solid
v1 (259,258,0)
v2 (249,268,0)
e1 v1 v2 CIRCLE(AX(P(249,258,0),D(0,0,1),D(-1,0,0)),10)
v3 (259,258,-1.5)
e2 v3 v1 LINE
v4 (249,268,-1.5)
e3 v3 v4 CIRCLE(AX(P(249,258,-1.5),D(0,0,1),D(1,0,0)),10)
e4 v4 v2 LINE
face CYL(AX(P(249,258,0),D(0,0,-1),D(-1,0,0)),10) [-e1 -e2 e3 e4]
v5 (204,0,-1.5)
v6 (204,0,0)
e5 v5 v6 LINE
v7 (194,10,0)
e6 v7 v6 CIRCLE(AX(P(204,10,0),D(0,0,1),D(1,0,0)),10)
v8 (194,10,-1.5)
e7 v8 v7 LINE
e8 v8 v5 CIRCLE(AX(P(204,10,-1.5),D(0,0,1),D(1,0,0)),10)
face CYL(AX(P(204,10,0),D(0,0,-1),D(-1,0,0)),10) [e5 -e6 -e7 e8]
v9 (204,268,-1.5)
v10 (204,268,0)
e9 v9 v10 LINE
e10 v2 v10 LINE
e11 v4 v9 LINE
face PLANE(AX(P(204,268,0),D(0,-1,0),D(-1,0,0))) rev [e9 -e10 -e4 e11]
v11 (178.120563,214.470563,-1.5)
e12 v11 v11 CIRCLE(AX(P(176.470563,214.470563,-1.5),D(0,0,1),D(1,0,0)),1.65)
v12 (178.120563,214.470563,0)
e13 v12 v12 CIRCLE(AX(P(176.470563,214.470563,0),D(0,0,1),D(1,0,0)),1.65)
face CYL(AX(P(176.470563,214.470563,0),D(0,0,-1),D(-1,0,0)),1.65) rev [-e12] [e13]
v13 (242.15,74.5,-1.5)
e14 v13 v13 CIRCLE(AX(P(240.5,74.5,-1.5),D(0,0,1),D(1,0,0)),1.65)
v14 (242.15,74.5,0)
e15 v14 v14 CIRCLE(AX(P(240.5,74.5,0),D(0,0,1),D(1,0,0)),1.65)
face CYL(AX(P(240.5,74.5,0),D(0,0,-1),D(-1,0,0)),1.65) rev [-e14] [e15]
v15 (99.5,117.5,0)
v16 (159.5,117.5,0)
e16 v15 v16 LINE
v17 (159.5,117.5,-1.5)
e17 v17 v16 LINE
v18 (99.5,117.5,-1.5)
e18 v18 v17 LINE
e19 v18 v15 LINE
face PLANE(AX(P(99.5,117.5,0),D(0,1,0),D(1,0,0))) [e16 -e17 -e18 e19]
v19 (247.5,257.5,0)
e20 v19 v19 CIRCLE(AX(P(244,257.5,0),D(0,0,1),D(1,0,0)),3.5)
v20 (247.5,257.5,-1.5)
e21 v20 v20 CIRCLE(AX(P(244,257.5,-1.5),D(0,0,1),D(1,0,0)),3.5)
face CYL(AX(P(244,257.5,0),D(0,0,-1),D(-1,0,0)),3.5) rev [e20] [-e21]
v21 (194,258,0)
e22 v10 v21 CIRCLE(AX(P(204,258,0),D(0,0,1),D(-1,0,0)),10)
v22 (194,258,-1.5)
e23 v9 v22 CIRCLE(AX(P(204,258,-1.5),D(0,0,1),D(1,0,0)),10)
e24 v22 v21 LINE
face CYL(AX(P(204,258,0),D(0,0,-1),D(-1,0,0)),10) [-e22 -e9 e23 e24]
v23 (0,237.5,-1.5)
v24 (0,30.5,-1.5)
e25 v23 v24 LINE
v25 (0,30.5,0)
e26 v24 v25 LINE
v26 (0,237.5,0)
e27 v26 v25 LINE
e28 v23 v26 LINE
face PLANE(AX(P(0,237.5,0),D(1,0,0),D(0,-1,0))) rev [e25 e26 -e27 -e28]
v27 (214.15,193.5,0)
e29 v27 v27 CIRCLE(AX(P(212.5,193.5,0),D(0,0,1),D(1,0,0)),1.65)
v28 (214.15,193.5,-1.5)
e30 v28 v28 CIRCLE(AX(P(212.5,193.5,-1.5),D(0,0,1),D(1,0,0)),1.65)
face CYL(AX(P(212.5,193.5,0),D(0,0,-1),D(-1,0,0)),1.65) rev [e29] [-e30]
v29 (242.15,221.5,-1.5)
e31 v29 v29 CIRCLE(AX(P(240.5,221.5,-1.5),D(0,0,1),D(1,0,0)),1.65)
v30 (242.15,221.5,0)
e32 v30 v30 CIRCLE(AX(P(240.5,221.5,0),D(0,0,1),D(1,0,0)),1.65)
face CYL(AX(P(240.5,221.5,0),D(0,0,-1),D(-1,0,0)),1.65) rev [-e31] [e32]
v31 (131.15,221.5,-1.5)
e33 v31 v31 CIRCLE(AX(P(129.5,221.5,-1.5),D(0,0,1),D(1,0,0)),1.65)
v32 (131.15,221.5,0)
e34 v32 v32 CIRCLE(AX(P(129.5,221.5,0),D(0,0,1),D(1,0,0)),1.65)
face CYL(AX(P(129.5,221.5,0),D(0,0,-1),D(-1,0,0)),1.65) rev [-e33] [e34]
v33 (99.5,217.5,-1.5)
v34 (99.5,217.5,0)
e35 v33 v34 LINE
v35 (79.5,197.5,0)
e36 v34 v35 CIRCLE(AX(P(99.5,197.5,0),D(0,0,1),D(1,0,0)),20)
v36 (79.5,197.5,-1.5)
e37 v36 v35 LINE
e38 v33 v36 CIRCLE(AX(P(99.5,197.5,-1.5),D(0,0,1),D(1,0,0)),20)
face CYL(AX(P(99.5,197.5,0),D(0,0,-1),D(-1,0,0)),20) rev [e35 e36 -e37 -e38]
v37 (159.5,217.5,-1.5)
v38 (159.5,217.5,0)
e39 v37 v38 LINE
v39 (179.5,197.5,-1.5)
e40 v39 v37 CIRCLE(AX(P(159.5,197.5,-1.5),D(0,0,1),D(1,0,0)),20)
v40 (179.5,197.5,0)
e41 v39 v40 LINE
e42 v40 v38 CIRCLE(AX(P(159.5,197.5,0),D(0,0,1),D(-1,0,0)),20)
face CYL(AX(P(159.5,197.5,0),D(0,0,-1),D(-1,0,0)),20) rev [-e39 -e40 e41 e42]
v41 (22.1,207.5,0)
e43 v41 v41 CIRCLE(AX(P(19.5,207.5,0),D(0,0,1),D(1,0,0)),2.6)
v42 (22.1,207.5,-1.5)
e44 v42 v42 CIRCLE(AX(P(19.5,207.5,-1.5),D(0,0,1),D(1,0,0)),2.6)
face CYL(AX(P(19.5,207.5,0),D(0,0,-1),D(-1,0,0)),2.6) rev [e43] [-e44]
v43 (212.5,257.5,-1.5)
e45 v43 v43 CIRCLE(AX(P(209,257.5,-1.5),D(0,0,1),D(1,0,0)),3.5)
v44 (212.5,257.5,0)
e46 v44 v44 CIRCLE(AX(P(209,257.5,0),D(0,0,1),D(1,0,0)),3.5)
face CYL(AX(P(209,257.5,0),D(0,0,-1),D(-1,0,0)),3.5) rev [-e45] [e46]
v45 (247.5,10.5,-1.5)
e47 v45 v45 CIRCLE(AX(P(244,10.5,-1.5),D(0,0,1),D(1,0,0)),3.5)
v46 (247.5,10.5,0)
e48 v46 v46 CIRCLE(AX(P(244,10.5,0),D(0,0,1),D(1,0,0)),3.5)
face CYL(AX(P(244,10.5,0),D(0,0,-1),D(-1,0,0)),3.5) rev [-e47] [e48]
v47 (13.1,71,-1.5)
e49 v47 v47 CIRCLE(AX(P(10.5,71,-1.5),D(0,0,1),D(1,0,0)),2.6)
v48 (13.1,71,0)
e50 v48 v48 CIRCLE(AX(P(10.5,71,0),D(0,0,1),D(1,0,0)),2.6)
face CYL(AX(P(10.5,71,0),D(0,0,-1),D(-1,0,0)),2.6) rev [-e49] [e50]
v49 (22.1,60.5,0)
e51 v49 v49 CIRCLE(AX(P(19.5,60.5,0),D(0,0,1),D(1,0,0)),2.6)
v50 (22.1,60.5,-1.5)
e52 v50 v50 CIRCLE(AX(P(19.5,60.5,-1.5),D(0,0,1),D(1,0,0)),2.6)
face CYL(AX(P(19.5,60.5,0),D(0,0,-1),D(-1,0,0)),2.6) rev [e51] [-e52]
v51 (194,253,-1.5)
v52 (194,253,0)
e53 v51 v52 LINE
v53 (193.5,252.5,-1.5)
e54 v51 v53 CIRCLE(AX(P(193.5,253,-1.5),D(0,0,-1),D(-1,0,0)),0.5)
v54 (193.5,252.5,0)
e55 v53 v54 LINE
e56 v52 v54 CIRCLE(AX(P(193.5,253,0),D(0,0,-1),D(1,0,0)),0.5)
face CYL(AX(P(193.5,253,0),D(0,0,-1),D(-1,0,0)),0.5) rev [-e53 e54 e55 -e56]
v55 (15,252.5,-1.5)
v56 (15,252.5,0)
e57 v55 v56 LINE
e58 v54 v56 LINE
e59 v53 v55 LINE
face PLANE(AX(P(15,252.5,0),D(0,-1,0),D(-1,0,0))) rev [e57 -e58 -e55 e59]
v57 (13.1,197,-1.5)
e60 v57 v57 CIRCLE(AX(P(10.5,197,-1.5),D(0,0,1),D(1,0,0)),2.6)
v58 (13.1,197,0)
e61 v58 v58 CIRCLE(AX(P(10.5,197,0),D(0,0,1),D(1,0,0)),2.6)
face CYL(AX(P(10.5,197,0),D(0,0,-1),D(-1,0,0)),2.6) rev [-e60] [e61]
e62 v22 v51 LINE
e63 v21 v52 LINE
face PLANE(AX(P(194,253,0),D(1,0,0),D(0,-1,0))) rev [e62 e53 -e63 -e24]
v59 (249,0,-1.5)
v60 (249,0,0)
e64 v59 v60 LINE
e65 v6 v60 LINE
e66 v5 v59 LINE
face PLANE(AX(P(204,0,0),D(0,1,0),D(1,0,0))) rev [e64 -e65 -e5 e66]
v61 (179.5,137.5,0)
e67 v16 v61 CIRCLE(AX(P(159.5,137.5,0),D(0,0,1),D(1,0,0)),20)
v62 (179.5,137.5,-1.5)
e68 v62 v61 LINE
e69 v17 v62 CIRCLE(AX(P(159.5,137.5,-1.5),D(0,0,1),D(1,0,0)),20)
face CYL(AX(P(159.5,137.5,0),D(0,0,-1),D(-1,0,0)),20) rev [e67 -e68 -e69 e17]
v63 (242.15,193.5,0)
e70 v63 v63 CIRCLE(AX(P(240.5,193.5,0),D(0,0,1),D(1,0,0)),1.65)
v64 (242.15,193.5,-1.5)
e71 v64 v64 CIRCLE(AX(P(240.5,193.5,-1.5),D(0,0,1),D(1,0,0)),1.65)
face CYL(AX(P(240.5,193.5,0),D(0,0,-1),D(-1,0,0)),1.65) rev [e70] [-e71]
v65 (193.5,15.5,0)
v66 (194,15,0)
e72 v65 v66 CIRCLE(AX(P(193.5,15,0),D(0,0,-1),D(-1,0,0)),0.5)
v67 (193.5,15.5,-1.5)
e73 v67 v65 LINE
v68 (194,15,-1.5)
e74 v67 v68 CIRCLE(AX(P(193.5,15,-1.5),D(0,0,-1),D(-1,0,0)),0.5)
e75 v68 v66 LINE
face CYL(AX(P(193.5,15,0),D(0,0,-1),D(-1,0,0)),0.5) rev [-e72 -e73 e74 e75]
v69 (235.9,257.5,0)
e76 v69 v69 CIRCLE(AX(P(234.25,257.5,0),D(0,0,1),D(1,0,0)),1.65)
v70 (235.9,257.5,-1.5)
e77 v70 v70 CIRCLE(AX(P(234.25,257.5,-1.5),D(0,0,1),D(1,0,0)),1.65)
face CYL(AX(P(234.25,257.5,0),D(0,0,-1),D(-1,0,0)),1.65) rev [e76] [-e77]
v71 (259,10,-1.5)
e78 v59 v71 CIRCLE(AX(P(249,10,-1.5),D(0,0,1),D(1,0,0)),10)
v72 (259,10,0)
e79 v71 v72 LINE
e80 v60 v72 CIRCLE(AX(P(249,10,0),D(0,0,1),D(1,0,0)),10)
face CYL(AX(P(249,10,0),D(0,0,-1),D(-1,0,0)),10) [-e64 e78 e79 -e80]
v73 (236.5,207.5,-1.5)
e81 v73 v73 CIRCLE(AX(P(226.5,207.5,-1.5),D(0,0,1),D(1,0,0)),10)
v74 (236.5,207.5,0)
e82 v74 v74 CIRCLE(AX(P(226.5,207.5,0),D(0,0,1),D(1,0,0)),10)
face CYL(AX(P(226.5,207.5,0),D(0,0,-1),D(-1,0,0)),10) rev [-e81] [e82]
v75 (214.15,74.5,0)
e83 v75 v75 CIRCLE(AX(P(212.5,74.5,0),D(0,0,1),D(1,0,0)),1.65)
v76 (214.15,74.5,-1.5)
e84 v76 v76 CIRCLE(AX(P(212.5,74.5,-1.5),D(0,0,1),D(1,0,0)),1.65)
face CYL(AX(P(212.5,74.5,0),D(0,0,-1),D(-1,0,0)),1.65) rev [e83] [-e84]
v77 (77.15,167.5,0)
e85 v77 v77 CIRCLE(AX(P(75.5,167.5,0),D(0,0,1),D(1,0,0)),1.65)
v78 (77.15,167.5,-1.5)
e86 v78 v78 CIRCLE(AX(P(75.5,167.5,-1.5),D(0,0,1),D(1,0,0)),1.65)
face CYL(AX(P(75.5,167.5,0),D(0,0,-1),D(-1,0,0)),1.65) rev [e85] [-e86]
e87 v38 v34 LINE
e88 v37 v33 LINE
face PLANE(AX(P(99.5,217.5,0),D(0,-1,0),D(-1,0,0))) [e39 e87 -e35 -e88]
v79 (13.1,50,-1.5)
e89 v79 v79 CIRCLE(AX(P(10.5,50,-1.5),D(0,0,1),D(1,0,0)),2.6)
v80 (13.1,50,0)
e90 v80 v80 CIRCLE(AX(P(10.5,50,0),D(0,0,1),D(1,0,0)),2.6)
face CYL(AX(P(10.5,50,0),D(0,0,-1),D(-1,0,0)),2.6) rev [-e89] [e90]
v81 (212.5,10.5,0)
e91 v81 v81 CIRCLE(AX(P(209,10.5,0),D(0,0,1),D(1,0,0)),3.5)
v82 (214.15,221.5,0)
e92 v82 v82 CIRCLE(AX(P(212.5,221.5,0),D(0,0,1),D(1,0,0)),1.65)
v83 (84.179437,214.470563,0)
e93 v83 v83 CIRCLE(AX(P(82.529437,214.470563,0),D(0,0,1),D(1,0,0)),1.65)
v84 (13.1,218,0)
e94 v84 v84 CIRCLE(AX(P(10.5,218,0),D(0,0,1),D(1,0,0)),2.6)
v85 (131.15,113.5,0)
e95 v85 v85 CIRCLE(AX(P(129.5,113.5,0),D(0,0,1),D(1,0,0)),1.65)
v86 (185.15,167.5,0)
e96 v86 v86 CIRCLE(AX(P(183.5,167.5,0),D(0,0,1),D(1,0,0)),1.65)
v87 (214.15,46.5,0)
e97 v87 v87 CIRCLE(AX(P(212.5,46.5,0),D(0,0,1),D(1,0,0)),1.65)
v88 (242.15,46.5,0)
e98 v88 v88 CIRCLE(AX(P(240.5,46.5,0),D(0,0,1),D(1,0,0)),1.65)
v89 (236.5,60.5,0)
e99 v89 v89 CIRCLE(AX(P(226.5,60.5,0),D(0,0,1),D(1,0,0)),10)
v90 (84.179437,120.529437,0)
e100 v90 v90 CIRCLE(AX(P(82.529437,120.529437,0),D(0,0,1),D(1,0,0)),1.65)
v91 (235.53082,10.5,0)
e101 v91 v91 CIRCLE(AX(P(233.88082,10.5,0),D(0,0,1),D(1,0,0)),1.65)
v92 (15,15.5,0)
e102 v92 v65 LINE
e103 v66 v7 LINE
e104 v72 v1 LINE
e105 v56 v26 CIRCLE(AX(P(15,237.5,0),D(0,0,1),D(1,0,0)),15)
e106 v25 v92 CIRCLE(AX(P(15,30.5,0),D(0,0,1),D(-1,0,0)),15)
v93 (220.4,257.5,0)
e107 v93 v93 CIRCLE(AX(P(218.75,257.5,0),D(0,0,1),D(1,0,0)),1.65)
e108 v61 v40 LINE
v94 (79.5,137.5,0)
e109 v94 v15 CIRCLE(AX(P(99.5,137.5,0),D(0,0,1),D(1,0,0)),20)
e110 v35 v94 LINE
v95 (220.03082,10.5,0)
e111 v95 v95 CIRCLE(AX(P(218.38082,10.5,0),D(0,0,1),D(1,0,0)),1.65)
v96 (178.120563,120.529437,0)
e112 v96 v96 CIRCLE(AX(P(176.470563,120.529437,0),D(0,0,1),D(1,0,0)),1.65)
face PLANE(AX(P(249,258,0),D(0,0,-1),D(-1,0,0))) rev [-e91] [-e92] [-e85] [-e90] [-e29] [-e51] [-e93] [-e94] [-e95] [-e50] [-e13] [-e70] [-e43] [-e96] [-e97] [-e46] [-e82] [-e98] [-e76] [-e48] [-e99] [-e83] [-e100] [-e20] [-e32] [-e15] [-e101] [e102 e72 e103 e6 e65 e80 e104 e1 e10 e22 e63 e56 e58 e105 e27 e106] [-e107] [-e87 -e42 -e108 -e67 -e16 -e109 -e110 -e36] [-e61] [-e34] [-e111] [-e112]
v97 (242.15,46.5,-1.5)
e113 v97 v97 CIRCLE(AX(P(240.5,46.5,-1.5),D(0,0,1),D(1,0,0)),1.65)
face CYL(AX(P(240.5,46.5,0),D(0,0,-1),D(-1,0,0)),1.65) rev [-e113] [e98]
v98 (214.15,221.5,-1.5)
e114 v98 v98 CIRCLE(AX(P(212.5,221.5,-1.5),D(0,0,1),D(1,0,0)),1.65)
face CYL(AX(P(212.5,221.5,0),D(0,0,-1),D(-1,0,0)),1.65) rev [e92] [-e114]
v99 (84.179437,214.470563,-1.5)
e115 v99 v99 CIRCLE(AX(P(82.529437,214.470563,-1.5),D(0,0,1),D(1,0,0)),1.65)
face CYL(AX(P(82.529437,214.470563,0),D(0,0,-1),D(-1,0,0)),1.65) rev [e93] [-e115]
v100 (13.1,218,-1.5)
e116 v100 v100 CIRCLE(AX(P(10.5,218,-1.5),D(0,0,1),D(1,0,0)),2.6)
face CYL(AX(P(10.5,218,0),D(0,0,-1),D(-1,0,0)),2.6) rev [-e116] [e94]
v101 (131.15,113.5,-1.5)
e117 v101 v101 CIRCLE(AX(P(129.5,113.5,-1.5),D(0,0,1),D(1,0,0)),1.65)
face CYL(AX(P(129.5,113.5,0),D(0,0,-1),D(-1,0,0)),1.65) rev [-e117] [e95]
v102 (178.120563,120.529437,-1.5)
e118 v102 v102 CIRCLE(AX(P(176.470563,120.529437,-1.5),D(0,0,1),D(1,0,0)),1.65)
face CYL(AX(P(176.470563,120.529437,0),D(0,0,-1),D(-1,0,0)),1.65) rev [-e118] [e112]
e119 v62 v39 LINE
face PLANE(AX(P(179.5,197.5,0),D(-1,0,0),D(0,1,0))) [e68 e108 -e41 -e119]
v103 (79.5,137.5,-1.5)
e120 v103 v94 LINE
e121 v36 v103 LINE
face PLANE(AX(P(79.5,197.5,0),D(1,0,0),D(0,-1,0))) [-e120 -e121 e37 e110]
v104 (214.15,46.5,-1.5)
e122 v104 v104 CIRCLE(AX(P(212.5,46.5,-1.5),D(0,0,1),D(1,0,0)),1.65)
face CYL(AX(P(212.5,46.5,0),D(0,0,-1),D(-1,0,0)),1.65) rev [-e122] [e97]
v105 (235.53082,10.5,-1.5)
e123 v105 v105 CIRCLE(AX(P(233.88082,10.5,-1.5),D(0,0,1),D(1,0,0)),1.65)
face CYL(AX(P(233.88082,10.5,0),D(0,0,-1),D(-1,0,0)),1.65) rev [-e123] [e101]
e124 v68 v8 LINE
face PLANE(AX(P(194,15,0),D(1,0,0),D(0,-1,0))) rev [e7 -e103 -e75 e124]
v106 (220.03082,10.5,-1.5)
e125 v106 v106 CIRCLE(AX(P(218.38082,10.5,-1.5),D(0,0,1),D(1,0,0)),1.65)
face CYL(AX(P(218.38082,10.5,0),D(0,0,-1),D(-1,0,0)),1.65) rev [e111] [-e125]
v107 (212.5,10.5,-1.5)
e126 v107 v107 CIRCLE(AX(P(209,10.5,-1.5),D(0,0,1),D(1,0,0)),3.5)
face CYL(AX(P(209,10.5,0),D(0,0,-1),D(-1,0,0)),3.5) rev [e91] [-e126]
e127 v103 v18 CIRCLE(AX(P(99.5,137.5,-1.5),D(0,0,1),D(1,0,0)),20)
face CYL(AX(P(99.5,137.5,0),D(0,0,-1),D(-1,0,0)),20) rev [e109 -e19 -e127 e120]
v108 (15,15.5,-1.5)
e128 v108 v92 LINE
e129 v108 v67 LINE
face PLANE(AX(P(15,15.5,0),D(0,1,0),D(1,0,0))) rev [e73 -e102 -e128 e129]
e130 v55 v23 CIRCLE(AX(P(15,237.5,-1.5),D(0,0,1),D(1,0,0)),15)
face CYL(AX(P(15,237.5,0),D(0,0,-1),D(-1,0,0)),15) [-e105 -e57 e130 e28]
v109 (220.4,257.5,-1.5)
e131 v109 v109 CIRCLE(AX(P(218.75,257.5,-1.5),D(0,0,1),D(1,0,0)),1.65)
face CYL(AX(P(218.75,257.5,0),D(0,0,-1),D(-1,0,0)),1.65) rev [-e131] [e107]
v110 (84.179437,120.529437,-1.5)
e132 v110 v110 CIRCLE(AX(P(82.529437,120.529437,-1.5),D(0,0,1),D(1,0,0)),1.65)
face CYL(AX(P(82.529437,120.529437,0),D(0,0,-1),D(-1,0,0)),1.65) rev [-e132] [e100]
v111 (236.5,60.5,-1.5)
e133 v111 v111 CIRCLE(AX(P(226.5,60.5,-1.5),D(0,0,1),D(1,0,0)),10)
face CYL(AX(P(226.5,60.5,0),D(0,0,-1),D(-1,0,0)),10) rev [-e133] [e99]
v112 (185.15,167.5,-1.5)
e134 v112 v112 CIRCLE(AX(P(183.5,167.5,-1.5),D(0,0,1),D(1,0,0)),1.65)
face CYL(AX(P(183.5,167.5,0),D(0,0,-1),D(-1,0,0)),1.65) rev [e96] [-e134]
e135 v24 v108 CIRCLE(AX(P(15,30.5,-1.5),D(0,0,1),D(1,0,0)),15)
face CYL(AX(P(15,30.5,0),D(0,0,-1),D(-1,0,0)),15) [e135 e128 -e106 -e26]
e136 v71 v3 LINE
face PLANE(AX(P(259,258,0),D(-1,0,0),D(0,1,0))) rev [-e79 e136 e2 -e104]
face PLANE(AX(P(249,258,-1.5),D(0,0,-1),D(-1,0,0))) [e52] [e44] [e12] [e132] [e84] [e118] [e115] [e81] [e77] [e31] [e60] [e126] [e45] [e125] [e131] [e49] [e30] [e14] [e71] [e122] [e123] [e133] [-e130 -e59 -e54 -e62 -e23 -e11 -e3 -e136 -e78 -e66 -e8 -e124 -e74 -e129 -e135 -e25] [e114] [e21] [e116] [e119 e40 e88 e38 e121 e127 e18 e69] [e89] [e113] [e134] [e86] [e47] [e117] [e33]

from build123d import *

# Parameters (mm, degrees)
CONVERT_SOLID1_START       = -1.5
CONVERT_SOLID1_OUTLINE_R   = 2.6
CONVERT_SOLID1_OUTLINE_R_2 = 1.65
CONVERT_SOLID1_OUTLINE_R_3 = 3.5
CONVERT_SOLID1_OUTLINE_R_4 = 10
CONVERT_SOLID1_DEPTH       = 1.5


# Read off the part's stored shape, not the designer's step: Convert-Solid1
with BuildPart() as part:
    # Convert-Solid1 outline → Convert-Solid1 (new body)
    with BuildSketch(Plane.XY.offset(CONVERT_SOLID1_START)):
        with BuildLine():
            ThreePointArc((204, 268), (196.928932188, 265.071067812), (194, 258))
            Line((194, 258), (194, 253))
            ThreePointArc((194, 253), (193.853553391, 252.646446609), (193.5, 252.5))
            Line((193.5, 252.5), (15, 252.5))
            ThreePointArc((15, 252.5), (4.393398282, 248.106601718), (0, 237.5))
            Line((0, 237.5), (0, 30.5))
            ThreePointArc((0, 30.5), (4.393398282, 19.893398282), (15, 15.5))
            Line((15, 15.5), (193.5, 15.5))
            ThreePointArc((193.5, 15.5), (193.853553391, 15.353553391), (194, 15))
            Line((194, 15), (194, 10))
            ThreePointArc((194, 10), (196.928932188, 2.928932188), (204, 0))
            Line((204, 0), (249, 0))
            ThreePointArc((249, 0), (256.071067812, 2.928932188), (259, 10))
            Line((259, 10), (259, 258))
            ThreePointArc((259, 258), (256.071067812, 265.071067812), (249, 268))
            Line((249, 268), (204, 268))
        make_face()
        with Locations((10.5, 50)):
            Circle(CONVERT_SOLID1_OUTLINE_R, mode=Mode.SUBTRACT)
        with Locations((19.5, 60.5)):
            Circle(CONVERT_SOLID1_OUTLINE_R, mode=Mode.SUBTRACT)
        with Locations((10.5, 71)):
            Circle(CONVERT_SOLID1_OUTLINE_R, mode=Mode.SUBTRACT)
        with Locations((82.529437252, 120.529437252)):
            Circle(CONVERT_SOLID1_OUTLINE_R_2, mode=Mode.SUBTRACT)
        with Locations((209, 10.5)):
            Circle(CONVERT_SOLID1_OUTLINE_R_3, mode=Mode.SUBTRACT)
        with Locations((218.380820142, 10.5)):
            Circle(CONVERT_SOLID1_OUTLINE_R_2, mode=Mode.SUBTRACT)
        with Locations((233.880820142, 10.5)):
            Circle(CONVERT_SOLID1_OUTLINE_R_2, mode=Mode.SUBTRACT)
        with Locations((244, 10.5)):
            Circle(CONVERT_SOLID1_OUTLINE_R_3, mode=Mode.SUBTRACT)
        with Locations((212.5, 46.5)):
            Circle(CONVERT_SOLID1_OUTLINE_R_2, mode=Mode.SUBTRACT)
        with Locations((226.5, 60.5)):
            Circle(CONVERT_SOLID1_OUTLINE_R_4, mode=Mode.SUBTRACT)
        with Locations((240.5, 46.5)):
            Circle(CONVERT_SOLID1_OUTLINE_R_2, mode=Mode.SUBTRACT)
        with Locations((129.5, 113.5)):
            Circle(CONVERT_SOLID1_OUTLINE_R_2, mode=Mode.SUBTRACT)
        with Locations((176.470562748, 120.529437252)):
            Circle(CONVERT_SOLID1_OUTLINE_R_2, mode=Mode.SUBTRACT)
        with Locations((212.5, 74.5)):
            Circle(CONVERT_SOLID1_OUTLINE_R_2, mode=Mode.SUBTRACT)
        with Locations((240.5, 74.5)):
            Circle(CONVERT_SOLID1_OUTLINE_R_2, mode=Mode.SUBTRACT)
        with Locations((10.5, 197)):
            Circle(CONVERT_SOLID1_OUTLINE_R, mode=Mode.SUBTRACT)
        with Locations((75.5, 167.5)):
            Circle(CONVERT_SOLID1_OUTLINE_R_2, mode=Mode.SUBTRACT)
        with Locations((19.5, 207.5)):
            Circle(CONVERT_SOLID1_OUTLINE_R, mode=Mode.SUBTRACT)
        with Locations((10.5, 218)):
            Circle(CONVERT_SOLID1_OUTLINE_R, mode=Mode.SUBTRACT)
        with Locations((82.529437252, 214.470562748)):
            Circle(CONVERT_SOLID1_OUTLINE_R_2, mode=Mode.SUBTRACT)
        with BuildLine():
            Line((179.5, 197.5), (179.5, 137.5))
            ThreePointArc((179.5, 137.5), (173.642135624, 123.357864376), (159.5, 117.5))
            Line((159.5, 117.5), (99.5, 117.5))
            ThreePointArc((99.5, 117.5), (85.357864376, 123.357864376), (79.5, 137.5))
            Line((79.5, 137.5), (79.5, 197.5))
            ThreePointArc((79.5, 197.5), (85.357864376, 211.642135624), (99.5, 217.5))
            Line((99.5, 217.5), (159.5, 217.5))
            ThreePointArc((159.5, 217.5), (173.642135624, 211.642135624), (179.5, 197.5))
        make_face(mode=Mode.SUBTRACT)
        with Locations((183.5, 167.5)):
            Circle(CONVERT_SOLID1_OUTLINE_R_2, mode=Mode.SUBTRACT)
        with Locations((212.5, 193.5)):
            Circle(CONVERT_SOLID1_OUTLINE_R_2, mode=Mode.SUBTRACT)
        with Locations((240.5, 193.5)):
            Circle(CONVERT_SOLID1_OUTLINE_R_2, mode=Mode.SUBTRACT)
        with Locations((129.5, 221.5)):
            Circle(CONVERT_SOLID1_OUTLINE_R_2, mode=Mode.SUBTRACT)
        with Locations((176.470562748, 214.470562748)):
            Circle(CONVERT_SOLID1_OUTLINE_R_2, mode=Mode.SUBTRACT)
        with Locations((226.5, 207.5)):
            Circle(CONVERT_SOLID1_OUTLINE_R_4, mode=Mode.SUBTRACT)
        with Locations((212.5, 221.5)):
            Circle(CONVERT_SOLID1_OUTLINE_R_2, mode=Mode.SUBTRACT)
        with Locations((240.5, 221.5)):
            Circle(CONVERT_SOLID1_OUTLINE_R_2, mode=Mode.SUBTRACT)
        with Locations((209, 257.5)):
            Circle(CONVERT_SOLID1_OUTLINE_R_3, mode=Mode.SUBTRACT)
        with Locations((218.75, 257.5)):
            Circle(CONVERT_SOLID1_OUTLINE_R_2, mode=Mode.SUBTRACT)
        with Locations((234.25, 257.5)):
            Circle(CONVERT_SOLID1_OUTLINE_R_2, mode=Mode.SUBTRACT)
        with Locations((244, 257.5)):
            Circle(CONVERT_SOLID1_OUTLINE_R_3, mode=Mode.SUBTRACT)
    extrude(amount=CONVERT_SOLID1_DEPTH)


solid = part.part
